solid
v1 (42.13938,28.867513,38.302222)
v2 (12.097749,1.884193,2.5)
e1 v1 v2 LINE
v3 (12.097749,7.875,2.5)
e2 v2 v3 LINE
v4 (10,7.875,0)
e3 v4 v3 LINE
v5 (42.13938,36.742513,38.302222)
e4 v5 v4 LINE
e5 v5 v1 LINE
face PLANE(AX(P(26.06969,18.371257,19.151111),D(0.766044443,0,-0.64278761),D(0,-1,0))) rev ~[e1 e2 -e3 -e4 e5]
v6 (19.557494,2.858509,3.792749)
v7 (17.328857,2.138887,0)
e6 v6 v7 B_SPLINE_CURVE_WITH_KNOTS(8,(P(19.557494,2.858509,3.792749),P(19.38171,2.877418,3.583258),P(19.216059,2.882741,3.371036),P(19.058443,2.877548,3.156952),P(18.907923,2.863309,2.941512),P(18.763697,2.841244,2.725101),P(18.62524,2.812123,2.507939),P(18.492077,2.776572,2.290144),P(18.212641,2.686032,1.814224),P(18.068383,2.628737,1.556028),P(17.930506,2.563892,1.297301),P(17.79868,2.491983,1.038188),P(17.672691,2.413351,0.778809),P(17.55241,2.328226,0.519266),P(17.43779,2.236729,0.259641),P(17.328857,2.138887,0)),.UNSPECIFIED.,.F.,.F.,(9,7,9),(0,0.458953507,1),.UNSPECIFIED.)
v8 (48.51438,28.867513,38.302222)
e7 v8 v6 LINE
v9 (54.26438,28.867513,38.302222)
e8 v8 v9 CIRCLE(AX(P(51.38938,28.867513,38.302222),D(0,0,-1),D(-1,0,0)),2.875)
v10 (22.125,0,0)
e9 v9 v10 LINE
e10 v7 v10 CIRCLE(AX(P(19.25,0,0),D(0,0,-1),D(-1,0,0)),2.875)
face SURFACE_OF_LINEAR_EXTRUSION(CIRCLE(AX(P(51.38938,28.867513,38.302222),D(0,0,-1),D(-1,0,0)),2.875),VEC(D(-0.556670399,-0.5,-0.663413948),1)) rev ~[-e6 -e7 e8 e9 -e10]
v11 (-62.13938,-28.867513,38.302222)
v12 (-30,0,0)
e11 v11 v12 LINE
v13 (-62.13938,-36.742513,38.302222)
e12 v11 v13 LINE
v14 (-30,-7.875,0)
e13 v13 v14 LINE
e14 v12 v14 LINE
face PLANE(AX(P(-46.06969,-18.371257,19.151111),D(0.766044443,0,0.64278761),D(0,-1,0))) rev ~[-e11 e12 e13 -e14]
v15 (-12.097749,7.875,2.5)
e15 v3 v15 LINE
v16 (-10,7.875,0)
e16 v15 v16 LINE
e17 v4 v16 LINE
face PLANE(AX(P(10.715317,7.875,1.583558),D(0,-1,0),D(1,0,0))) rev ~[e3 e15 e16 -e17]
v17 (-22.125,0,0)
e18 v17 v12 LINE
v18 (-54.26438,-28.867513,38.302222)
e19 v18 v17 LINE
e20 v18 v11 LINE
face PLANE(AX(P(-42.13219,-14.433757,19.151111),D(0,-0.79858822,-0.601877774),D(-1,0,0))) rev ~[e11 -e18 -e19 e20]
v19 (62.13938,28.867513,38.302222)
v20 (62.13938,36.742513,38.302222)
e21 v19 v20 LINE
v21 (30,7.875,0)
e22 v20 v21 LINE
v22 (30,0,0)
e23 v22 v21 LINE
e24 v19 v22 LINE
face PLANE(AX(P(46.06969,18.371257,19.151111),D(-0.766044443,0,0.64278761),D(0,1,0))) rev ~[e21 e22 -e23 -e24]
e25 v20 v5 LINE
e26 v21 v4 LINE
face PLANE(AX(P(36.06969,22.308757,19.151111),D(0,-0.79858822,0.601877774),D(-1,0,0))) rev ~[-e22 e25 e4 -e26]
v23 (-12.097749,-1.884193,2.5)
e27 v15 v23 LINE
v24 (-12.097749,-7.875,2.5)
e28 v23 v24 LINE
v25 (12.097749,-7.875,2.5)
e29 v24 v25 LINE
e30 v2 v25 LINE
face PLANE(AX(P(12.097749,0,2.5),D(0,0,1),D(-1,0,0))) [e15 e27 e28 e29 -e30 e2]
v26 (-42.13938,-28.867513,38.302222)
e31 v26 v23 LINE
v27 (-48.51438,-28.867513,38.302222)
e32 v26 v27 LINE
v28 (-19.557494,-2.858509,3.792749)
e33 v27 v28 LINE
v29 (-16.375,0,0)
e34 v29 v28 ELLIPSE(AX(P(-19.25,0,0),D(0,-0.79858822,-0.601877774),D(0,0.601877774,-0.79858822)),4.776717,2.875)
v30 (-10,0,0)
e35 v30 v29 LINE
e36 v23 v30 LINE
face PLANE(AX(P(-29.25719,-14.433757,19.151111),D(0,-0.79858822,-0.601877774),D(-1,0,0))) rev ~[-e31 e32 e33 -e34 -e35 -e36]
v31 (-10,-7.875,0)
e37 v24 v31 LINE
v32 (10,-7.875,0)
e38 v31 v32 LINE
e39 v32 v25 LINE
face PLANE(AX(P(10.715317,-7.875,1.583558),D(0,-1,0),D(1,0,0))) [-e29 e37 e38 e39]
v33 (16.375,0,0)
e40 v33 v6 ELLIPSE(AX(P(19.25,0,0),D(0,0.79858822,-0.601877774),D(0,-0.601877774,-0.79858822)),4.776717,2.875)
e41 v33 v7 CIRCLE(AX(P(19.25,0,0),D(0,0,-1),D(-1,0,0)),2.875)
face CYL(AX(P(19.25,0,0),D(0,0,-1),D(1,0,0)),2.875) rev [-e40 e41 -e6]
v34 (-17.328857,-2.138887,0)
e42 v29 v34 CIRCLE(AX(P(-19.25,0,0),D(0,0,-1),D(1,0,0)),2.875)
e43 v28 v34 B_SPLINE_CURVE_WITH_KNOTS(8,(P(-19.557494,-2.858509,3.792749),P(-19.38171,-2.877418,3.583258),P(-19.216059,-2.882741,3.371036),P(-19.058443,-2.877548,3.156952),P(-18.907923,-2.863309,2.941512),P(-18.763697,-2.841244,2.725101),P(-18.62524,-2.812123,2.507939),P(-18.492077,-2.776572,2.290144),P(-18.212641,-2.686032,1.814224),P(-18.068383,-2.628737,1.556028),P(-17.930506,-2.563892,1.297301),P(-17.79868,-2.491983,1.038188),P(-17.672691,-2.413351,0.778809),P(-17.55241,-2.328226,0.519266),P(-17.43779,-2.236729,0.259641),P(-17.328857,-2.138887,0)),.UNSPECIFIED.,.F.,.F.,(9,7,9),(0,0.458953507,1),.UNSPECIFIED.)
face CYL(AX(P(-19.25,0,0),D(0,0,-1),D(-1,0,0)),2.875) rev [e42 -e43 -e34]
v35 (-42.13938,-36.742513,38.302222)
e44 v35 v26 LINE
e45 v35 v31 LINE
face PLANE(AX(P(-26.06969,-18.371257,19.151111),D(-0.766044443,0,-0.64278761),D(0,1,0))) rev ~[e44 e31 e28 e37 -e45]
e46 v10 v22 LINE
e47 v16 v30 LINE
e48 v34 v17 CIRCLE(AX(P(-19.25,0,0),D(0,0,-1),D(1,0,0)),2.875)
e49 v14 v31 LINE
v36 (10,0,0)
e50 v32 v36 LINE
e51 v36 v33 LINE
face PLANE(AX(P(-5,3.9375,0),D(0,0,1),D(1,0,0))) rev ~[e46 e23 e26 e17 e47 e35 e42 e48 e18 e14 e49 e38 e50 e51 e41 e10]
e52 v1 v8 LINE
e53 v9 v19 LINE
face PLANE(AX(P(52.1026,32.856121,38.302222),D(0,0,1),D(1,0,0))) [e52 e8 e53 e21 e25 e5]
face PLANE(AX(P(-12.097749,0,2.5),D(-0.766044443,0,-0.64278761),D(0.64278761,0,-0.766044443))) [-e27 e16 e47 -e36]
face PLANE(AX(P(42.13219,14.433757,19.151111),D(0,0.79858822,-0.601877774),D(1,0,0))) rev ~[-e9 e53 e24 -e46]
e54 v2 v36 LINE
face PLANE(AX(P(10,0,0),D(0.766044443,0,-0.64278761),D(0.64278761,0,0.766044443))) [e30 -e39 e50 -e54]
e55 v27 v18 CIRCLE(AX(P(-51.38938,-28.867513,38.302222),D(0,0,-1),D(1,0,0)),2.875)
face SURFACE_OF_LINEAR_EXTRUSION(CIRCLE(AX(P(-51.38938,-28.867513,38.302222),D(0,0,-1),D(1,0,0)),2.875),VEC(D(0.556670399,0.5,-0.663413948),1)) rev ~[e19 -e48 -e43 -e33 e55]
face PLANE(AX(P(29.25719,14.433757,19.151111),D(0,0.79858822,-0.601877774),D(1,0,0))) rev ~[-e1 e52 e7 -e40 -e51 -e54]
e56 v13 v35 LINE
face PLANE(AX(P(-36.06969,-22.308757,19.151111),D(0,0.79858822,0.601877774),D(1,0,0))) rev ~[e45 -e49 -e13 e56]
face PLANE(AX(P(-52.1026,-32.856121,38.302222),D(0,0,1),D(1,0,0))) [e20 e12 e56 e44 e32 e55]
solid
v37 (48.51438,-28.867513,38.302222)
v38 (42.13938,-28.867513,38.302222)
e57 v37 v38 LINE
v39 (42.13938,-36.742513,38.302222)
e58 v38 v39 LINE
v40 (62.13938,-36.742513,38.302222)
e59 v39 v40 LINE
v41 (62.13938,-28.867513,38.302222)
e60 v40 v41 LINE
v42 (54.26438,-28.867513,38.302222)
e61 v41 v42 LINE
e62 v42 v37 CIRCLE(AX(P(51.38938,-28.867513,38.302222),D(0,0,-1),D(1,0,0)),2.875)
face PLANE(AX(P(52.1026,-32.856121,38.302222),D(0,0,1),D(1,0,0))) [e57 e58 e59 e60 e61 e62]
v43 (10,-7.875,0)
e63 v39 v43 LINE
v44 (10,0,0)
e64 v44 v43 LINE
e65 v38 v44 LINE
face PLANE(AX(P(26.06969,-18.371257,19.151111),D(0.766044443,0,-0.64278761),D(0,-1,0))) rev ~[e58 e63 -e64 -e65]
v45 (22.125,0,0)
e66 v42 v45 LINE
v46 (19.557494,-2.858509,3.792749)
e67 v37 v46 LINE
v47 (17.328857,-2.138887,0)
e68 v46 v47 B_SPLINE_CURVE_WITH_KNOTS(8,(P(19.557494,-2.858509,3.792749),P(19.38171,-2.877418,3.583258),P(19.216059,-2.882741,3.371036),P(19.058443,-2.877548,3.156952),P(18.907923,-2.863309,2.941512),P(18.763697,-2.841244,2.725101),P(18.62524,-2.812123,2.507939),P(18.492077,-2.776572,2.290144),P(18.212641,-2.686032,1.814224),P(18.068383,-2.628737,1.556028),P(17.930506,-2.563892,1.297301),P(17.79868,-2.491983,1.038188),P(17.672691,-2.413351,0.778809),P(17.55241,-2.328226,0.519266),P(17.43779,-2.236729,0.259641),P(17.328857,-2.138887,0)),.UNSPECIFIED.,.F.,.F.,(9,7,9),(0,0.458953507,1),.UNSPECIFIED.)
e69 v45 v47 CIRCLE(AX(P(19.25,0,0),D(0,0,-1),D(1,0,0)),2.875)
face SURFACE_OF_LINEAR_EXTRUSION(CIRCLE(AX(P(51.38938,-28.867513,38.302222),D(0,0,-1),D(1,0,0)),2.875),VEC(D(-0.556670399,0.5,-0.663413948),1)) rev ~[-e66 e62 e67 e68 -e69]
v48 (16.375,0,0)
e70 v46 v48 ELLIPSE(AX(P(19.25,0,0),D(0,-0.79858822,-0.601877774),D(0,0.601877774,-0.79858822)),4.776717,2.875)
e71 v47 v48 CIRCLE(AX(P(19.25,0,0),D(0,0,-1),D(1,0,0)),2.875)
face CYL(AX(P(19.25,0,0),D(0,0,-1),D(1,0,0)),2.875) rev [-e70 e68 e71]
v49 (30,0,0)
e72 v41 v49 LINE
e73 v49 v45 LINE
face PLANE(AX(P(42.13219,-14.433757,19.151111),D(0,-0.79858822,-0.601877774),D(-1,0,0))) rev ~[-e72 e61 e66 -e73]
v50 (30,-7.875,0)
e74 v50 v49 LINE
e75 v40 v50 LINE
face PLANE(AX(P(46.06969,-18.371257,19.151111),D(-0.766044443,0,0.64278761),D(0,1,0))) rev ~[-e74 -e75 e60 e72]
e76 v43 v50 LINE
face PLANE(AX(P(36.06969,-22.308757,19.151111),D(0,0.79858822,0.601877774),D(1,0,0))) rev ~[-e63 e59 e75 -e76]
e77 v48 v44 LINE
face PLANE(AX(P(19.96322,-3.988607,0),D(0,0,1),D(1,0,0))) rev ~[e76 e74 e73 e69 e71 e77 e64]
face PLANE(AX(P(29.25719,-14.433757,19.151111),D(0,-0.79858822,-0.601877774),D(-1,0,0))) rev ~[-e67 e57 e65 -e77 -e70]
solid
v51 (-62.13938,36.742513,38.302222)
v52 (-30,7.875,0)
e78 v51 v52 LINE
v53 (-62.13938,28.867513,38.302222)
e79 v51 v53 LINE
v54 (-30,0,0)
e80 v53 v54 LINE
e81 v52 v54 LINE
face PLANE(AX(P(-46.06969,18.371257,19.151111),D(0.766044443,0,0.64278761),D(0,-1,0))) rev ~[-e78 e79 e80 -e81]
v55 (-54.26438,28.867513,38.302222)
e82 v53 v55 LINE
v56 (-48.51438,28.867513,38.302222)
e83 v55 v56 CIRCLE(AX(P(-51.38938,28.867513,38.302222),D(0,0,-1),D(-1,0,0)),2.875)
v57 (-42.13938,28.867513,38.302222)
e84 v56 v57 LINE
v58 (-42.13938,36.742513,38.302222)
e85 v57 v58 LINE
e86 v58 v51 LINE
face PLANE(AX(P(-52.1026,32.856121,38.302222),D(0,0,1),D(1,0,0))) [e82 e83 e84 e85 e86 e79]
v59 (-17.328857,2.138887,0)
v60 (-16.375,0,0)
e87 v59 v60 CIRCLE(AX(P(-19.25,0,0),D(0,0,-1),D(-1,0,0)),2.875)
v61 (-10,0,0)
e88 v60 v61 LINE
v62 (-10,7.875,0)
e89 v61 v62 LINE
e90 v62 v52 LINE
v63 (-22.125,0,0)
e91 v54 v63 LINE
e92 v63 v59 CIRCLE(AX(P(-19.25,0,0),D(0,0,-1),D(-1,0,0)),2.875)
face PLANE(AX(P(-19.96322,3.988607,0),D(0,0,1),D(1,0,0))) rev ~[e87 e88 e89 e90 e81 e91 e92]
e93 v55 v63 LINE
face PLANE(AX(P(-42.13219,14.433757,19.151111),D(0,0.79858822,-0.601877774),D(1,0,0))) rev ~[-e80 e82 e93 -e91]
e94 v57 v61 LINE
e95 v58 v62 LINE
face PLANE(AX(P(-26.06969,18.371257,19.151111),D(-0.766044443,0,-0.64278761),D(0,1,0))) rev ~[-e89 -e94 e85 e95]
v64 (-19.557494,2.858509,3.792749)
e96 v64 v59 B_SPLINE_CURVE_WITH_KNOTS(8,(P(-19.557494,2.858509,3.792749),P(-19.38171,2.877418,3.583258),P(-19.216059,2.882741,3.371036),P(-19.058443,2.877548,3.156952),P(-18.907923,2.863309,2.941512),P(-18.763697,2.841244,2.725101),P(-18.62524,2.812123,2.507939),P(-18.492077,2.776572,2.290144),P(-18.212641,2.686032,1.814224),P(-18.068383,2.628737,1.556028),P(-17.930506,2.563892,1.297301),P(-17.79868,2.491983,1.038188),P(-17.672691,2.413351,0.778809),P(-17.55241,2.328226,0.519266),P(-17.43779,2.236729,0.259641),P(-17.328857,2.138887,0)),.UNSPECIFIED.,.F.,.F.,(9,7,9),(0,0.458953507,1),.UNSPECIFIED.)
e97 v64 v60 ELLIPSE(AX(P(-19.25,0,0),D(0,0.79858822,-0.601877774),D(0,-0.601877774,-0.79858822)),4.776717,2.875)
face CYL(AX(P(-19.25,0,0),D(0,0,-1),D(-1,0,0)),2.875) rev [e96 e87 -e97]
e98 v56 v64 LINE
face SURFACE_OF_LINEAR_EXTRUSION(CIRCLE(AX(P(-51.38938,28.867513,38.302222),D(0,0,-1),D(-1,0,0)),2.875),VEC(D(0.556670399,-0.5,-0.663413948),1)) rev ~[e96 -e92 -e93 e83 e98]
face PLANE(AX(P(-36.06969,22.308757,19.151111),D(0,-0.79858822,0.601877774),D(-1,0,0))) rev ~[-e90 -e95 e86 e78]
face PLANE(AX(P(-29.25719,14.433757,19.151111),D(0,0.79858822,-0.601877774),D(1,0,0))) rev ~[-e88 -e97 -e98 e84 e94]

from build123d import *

# Parameters (mm, degrees)
F0_W           = 10
F0_H           = 7.875
F1_DEPTH       = 2.5
F11_DEPTH      = 25
F13_DEPTH      = 7.875
F13_DEPTH_BACK = 7.875


with BuildPart() as f1:
    # F0 (on Top) → F1 (new body)
    with BuildSketch(Plane.XY):
        with Locations((-5, 3.9375)):
            Rectangle(F0_W, F0_H)
        with Locations((5, 3.9375)):
            Rectangle(F0_W, F0_H)
        with Locations((5, -3.9375)):
            Rectangle(F0_W, F0_H)
        with Locations((-5, -3.9375)):
            Rectangle(F0_W, F0_H)
    extrude(amount=F1_DEPTH)

    # F8: sweep along a path in F4
    with BuildLine(Plane(origin=(-5.8682408883, 0, -4.9240387651), x_dir=(0, 1, 0), z_dir=(0.7660444431, 0, 0.6427876097))) as f8_path:
        Line((-28.8675134595, 56.6363319121), (0, 6.6363319121))
    # F0 (on Top) → F8 (sweep)
    with BuildSketch(Plane.XY):
        with BuildLine():
            Line((-10, 0), (-16.375, 0))
            ThreePointArc((-16.375, 0), (-19.25, -2.875), (-22.125, 0))
            Line((-22.125, 0), (-30, 0))
            Line((-30, 0), (-30, -7.875))
            Line((-30, -7.875), (-10, -7.875))
            Line((-10, -7.875), (-10, 0))
        make_face()
    sweep(path=f8_path.line)

    # F10: sweep along a path in F7
    with BuildLine(Plane(origin=(5.8682408883, 0, -4.9240387651), x_dir=(0, 1, 0), z_dir=(0.7660444431, 0, -0.6427876097))) as f10_path:
        Line((28.8675134595, 56.5418889989), (0, 6.5418889989))
    # F0 (on Top) → F10 (sweep)
    with BuildSketch(Plane.XY):
        with BuildLine():
            Line((10, 7.875), (10, 0))
            Line((10, 0), (16.375, 0))
            ThreePointArc((16.375, 0), (19.25, 2.875), (22.125, 0))
            Line((22.125, 0), (30, 0))
            Line((30, 0), (30, 7.875))
            Line((30, 7.875), (10, 7.875))
        make_face()
    sweep(path=f10_path.line)


with BuildPart() as f5:
    # F5: sweep along a path in F4
    with BuildLine(Plane(origin=(-5.8682408883, 0, -4.9240387651), x_dir=(0, 1, 0), z_dir=(0.7660444431, 0, 0.6427876097))) as f5_path:
        Line((28.8675134595, 56.6363319121), (0, 6.6363319121))
    # F0 (on Top) → F5 (sweep)
    with BuildSketch(Plane.XY):
        with BuildLine():
            ThreePointArc((-22.125, 0), (-19.25, 2.875), (-16.375, 0))
            Line((-16.375, 0), (-10, 0))
            Line((-10, 0), (-10, 7.875))
            Line((-10, 7.875), (-30, 7.875))
            Line((-30, 7.875), (-30, 0))
            Line((-30, 0), (-22.125, 0))
        make_face()
    sweep(path=f5_path.line)


with BuildPart() as f9:
    # F9: sweep along a path in F7
    with BuildLine(Plane(origin=(5.8682408883, 0, -4.9240387651), x_dir=(0, 1, 0), z_dir=(0.7660444431, 0, -0.6427876097))) as f9_path:
        Line((-28.8675134595, 56.5418889989), (0, 6.5418889989))
    # F0 (on Top) → F9 (sweep)
    with BuildSketch(Plane.XY):
        with BuildLine():
            Line((16.375, 0), (10, 0))
            Line((10, 0), (10, -7.875))
            Line((10, -7.875), (30, -7.875))
            Line((30, -7.875), (30, 0))
            Line((30, 0), (22.125, 0))
            ThreePointArc((22.125, 0), (19.25, -2.875), (16.375, 0))
        make_face()
    sweep(path=f9_path.line)


with BuildPart() as f11_tool:
    # F0 (on Top) → F11 (new body)
    with BuildSketch(Plane.XY):
        with BuildLine():
            Line((19.25, 0), (16.375, 0))
            ThreePointArc((16.375, 0), (19.25, -2.875), (22.125, 0))
            Line((22.125, 0), (19.25, 0))
        make_face()
        with BuildLine():
            ThreePointArc((22.125, 0), (19.25, 2.875), (16.375, 0))
            Line((16.375, 0), (19.25, 0))
            Line((19.25, 0), (22.125, 0))
        make_face()
        with BuildLine():
            Line((-22.125, 0), (-19.25, 0))
            Line((-19.25, 0), (-16.375, 0))
            ThreePointArc((-16.375, 0), (-19.25, 2.875), (-22.125, 0))
        make_face()
        with BuildLine():
            Line((-16.375, 0), (-19.25, 0))
            Line((-19.25, 0), (-22.125, 0))
            ThreePointArc((-22.125, 0), (-19.25, -2.875), (-16.375, 0))
        make_face()
    extrude(amount=F11_DEPTH)


with BuildPart() as f1_1:
    add(f1.part)

    # F11: cut by f11_tool
    add(f11_tool.part, mode=Mode.SUBTRACT)

    # F12 (on Front) → F13 (join, two sides)
    with BuildSketch(Plane.XZ) as f13_sk:
        Polygon((10, 2.5), (10, 0), (12.0977490779, 2.5), align=None)
        Polygon((-12.0977490779, 2.5), (-10, 0), (-10, 2.5), align=None)
    extrude(amount=F13_DEPTH)
    extrude(f13_sk.sketch, amount=-F13_DEPTH_BACK)


with BuildPart() as f5_1:
    add(f5.part)

    # F11: cut by f11_tool
    add(f11_tool.part, mode=Mode.SUBTRACT)


with BuildPart() as f9_1:
    add(f9.part)

    # F11: cut by f11_tool
    add(f11_tool.part, mode=Mode.SUBTRACT)


solid = Compound([f1_1.part, f5_1.part, f9_1.part])
